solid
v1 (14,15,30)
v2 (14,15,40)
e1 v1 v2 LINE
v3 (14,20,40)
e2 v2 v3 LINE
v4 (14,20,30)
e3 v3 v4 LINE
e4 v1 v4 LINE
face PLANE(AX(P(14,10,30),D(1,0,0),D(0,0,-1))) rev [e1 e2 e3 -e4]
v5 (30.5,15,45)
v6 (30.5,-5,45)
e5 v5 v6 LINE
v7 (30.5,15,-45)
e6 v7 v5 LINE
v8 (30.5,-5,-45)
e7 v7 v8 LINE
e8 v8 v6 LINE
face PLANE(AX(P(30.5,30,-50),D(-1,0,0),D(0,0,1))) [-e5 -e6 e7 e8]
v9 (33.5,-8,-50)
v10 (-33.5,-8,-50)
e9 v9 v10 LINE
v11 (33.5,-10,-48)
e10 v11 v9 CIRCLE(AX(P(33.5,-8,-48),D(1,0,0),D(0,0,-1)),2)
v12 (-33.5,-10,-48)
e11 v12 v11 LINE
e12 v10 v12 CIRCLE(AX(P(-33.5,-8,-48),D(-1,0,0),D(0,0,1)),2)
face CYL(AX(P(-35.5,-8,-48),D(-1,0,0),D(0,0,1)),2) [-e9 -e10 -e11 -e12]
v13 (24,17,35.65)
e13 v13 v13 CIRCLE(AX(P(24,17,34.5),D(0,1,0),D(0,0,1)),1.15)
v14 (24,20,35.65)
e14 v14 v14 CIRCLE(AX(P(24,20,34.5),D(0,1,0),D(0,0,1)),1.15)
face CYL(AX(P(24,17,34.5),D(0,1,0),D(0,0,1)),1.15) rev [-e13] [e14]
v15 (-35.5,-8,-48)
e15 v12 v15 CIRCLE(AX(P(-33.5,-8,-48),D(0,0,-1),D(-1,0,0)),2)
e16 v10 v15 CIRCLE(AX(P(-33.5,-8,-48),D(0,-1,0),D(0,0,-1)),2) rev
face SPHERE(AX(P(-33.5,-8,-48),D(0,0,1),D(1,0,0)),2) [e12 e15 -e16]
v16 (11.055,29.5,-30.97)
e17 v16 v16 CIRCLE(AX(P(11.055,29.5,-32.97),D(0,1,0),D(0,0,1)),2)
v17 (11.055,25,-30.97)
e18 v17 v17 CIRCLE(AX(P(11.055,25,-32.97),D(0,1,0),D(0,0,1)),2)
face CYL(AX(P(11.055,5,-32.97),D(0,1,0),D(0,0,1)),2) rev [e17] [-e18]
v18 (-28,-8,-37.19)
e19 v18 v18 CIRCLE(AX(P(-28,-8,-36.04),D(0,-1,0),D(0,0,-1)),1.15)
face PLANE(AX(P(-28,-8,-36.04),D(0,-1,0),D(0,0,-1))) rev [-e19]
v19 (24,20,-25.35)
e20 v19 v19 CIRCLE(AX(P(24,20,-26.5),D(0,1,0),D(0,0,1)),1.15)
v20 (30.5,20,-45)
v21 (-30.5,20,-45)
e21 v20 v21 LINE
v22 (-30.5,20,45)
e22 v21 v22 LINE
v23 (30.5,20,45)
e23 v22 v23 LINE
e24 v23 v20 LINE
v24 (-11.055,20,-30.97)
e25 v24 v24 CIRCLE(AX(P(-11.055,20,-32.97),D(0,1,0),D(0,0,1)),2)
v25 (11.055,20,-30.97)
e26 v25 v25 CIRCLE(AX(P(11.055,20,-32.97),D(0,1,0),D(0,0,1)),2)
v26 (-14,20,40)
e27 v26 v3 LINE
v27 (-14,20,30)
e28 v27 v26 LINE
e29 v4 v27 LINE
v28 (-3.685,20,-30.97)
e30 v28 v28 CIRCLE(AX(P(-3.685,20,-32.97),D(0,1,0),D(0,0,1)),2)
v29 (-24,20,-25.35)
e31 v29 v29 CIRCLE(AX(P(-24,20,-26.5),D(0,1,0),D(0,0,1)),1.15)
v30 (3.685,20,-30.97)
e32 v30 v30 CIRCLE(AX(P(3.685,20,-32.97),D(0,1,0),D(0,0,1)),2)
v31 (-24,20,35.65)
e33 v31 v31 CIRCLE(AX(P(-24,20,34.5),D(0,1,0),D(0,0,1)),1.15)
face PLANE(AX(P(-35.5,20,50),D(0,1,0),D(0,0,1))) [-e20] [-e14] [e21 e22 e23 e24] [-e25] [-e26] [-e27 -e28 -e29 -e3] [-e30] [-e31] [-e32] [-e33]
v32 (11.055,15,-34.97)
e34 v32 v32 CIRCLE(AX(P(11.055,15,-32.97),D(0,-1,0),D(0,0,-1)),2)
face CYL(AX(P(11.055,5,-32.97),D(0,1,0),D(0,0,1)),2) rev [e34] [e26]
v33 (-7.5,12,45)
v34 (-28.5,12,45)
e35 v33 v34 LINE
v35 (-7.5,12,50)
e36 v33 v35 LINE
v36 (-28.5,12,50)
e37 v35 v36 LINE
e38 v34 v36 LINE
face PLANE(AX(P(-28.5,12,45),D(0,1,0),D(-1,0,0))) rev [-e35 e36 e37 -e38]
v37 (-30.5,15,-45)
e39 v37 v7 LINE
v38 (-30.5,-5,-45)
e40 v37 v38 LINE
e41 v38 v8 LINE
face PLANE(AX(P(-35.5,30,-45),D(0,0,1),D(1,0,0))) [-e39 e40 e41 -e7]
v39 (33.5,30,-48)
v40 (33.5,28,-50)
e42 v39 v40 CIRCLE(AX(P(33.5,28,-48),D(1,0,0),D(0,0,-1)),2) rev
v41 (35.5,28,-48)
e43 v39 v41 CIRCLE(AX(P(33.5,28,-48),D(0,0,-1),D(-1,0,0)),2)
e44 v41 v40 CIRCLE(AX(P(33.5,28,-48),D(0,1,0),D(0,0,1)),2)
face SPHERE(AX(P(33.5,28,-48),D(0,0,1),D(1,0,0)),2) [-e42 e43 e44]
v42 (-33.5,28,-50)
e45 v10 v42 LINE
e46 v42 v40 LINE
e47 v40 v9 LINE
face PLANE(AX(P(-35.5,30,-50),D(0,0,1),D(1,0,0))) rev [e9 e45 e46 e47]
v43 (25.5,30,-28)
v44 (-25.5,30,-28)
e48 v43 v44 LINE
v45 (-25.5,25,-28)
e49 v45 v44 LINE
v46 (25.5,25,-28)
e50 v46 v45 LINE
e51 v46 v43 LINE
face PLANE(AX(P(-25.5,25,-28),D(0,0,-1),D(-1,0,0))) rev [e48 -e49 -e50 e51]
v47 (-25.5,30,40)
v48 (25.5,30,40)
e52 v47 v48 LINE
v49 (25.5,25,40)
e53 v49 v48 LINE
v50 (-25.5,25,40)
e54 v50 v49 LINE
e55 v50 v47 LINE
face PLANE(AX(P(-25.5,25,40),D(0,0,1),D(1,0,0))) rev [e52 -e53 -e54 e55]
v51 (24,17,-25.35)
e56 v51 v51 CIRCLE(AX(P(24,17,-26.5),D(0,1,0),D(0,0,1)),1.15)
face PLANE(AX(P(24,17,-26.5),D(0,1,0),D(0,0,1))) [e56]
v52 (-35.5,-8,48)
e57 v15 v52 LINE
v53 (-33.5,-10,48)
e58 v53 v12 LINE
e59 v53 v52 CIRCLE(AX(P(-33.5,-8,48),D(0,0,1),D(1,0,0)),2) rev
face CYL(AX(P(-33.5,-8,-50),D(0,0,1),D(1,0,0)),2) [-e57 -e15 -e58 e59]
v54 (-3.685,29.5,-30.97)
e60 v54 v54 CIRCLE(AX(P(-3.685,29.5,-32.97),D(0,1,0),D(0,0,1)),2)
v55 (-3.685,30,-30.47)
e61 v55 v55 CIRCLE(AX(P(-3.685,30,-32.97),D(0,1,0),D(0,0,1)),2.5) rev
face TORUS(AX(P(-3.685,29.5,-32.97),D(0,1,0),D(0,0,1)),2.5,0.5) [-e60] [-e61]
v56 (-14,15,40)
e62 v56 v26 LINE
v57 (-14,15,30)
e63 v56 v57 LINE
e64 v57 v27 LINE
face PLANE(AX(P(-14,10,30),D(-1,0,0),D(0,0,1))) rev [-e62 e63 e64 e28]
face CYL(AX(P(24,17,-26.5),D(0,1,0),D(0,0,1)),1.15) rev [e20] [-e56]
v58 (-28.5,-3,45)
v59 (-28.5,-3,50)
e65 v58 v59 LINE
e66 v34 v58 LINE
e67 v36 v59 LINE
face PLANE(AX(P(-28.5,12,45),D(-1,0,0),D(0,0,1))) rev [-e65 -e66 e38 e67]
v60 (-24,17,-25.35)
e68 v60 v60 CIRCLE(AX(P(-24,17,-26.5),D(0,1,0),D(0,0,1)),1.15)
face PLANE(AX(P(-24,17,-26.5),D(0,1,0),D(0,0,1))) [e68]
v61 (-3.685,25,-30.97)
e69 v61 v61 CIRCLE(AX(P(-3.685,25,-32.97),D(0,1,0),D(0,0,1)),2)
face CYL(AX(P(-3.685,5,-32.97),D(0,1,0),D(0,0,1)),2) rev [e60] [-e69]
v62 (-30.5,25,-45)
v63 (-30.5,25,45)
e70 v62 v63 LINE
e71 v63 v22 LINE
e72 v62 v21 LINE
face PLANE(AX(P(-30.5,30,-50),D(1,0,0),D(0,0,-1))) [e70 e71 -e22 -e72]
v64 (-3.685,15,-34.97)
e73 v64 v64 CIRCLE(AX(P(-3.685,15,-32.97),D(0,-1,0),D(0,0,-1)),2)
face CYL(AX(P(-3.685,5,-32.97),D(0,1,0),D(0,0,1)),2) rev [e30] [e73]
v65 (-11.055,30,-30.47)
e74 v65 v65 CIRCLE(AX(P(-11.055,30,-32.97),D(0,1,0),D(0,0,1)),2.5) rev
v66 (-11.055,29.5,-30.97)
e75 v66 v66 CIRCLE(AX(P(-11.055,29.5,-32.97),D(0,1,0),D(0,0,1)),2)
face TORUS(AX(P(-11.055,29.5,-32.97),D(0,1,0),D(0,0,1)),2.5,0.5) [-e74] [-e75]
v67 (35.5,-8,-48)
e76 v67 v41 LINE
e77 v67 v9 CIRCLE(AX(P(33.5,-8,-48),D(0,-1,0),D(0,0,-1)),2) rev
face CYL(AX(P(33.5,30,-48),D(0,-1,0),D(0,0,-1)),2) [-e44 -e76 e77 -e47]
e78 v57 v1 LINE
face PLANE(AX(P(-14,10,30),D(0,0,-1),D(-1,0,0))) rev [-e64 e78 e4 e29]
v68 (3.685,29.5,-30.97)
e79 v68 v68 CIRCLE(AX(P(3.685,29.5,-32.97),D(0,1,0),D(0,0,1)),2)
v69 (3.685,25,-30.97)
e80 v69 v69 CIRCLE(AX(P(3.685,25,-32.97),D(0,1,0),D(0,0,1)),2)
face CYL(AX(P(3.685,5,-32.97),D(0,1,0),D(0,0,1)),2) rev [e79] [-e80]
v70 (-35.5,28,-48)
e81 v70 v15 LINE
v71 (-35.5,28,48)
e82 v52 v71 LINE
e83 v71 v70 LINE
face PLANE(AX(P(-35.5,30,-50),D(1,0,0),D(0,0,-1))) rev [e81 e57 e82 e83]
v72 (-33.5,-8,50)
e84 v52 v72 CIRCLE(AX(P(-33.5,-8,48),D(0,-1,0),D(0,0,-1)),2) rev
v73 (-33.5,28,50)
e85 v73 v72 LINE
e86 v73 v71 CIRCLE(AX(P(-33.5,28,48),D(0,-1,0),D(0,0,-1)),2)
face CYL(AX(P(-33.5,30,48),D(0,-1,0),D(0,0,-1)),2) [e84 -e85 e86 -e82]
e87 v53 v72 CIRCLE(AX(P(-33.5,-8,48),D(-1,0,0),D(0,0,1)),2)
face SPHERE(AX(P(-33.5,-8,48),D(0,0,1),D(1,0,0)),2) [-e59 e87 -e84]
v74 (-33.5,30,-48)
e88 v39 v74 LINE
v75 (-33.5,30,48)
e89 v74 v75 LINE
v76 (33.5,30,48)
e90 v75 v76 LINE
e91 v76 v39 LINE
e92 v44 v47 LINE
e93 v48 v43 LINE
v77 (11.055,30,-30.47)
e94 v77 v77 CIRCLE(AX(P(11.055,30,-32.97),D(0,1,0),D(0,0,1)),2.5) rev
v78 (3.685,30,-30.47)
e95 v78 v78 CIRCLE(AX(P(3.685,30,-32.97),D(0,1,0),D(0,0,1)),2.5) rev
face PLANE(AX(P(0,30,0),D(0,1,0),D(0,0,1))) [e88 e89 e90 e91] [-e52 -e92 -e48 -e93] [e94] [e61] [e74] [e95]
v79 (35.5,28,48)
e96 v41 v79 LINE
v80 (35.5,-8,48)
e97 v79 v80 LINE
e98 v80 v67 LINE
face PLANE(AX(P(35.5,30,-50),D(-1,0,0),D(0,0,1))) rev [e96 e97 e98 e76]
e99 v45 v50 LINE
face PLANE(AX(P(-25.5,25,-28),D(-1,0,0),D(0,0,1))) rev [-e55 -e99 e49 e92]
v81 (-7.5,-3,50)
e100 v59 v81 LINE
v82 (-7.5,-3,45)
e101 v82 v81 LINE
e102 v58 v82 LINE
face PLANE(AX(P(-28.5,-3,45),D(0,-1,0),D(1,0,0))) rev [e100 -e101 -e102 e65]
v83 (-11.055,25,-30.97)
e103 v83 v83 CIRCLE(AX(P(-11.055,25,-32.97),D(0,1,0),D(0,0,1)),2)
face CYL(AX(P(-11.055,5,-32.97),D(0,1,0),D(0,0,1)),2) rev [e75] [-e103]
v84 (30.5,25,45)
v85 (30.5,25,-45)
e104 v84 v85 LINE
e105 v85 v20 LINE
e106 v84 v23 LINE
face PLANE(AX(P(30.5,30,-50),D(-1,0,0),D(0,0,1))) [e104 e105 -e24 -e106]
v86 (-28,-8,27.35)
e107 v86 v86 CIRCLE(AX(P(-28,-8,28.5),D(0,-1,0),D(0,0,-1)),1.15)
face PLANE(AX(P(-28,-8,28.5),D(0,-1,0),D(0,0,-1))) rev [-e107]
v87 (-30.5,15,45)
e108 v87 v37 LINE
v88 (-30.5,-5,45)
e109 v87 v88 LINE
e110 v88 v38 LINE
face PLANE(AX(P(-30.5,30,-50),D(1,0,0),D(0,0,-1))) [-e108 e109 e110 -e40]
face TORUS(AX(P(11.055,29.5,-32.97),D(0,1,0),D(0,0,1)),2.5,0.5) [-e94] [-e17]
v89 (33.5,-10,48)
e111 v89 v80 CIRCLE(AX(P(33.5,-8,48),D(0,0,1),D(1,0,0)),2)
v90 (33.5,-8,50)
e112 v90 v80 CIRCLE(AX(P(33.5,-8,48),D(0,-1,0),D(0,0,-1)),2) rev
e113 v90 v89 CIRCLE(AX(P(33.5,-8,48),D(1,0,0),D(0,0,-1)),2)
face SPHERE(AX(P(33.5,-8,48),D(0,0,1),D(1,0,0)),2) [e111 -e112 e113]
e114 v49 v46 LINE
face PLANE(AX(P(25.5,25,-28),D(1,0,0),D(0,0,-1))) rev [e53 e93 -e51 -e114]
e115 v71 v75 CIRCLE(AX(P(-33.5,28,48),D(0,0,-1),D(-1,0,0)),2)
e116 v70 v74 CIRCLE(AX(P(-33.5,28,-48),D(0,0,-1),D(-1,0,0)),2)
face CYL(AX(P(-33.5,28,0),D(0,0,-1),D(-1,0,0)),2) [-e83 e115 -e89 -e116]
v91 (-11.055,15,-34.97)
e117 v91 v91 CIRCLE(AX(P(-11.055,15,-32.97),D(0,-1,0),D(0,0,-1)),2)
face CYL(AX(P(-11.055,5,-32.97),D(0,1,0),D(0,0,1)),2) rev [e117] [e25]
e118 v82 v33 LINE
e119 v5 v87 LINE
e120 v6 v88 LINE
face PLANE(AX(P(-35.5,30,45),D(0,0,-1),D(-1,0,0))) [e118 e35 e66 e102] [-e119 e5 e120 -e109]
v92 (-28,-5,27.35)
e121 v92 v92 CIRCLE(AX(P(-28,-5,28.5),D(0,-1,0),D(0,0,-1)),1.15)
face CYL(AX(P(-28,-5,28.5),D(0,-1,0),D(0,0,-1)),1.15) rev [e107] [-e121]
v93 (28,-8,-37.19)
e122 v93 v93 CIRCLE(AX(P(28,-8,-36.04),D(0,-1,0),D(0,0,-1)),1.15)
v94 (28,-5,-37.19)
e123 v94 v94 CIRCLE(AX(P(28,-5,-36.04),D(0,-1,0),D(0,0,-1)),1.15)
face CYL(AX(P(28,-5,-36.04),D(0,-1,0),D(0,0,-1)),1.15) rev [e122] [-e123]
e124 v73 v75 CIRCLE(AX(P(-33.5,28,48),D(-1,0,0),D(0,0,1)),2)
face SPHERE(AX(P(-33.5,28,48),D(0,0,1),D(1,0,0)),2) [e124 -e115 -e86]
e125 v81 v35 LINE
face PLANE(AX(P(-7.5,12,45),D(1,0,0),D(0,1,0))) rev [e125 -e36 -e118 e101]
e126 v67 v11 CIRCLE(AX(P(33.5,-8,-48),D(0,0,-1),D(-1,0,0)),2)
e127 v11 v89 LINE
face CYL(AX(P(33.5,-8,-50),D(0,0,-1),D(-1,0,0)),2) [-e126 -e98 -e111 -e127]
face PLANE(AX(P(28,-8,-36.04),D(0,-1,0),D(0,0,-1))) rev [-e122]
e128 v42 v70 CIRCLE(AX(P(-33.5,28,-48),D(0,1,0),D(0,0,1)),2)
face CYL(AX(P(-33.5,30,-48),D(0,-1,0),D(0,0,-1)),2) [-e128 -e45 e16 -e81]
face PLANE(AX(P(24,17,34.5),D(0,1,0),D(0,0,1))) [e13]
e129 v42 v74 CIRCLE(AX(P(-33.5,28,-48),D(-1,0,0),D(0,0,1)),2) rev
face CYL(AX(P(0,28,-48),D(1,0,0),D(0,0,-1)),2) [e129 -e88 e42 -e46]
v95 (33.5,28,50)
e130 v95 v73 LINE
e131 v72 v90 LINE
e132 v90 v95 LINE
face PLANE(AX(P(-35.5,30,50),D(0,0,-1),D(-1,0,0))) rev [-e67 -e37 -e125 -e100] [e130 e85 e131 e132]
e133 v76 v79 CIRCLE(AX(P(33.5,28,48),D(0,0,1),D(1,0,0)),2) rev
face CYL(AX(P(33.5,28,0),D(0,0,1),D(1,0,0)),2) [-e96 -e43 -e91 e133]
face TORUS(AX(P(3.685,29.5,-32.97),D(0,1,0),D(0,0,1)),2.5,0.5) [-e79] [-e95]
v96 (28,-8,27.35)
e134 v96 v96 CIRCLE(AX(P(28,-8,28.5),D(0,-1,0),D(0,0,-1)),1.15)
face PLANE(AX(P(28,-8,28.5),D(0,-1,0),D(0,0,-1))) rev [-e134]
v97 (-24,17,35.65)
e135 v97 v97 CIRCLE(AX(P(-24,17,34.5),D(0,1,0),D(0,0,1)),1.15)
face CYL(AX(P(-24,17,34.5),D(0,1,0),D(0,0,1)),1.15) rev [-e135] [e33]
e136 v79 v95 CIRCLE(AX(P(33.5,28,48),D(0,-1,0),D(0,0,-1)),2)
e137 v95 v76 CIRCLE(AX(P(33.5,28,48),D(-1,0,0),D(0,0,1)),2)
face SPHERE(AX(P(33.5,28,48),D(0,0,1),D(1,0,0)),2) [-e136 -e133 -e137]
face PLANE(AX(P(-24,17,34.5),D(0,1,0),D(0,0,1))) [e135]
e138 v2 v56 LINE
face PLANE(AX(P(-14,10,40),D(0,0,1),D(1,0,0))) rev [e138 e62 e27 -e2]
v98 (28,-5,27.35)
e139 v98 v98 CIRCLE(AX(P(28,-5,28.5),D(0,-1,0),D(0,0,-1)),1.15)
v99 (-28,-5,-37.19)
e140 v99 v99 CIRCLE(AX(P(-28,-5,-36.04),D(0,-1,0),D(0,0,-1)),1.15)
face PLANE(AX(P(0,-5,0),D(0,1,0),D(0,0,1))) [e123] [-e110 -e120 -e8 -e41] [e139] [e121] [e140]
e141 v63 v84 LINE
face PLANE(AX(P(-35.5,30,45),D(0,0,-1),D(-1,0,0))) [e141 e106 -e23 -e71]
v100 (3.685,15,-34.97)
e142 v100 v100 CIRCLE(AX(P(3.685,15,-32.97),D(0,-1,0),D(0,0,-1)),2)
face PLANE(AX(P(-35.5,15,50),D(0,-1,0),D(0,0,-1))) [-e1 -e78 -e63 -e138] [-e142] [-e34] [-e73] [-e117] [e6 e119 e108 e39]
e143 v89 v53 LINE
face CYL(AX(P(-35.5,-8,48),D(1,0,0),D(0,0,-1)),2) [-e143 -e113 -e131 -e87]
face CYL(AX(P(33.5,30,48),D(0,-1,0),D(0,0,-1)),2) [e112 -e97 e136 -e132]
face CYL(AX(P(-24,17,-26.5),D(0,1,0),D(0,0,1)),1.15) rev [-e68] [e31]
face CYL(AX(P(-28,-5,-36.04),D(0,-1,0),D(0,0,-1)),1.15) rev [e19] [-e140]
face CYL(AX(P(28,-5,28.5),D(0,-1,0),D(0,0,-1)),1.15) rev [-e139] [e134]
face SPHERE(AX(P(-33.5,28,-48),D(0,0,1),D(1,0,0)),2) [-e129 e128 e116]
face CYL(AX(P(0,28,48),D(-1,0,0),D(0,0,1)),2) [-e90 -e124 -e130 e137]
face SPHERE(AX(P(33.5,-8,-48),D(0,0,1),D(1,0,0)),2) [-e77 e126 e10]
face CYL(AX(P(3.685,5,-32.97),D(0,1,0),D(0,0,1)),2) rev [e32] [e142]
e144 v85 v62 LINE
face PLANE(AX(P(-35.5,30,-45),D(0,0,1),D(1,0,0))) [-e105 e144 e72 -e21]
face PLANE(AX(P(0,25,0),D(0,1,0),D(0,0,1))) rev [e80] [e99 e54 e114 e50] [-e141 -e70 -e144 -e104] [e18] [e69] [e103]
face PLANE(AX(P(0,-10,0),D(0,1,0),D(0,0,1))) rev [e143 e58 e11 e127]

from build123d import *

# Parameters (mm, degrees)
SKETCH1_W           = 71
SKETCH1_H           = 100
BOSS_EXTRUDE1_DEPTH = 30
SHELL3_T            = -5
SKETCH3_W           = 71
SKETCH3_H           = 100
BOSS_EXTRUDE2_DEPTH = 5
SKETCH4_W           = 51
SKETCH4_H           = 68
CUT_EXTRUDE2_DEPTH  = 5
SKETCH1_2_W         = 71
SKETCH1_2_H         = 100
BOSS_EXTRUDE3_DEPTH = 10
SKETCH10_W          = 61
SKETCH10_H          = 90
CUT_EXTRUDE6_DEPTH  = 20
SKETCH10_2_W        = 61
SKETCH10_2_H        = 90
BOSS_EXTRUDE4_DEPTH = 5
SKETCH12_W          = 100
SKETCH12_H          = 5
BOSS_EXTRUDE5_DEPTH = 71
SKETCH5_R           = 2
CUT_EXTRUDE3_DEPTH  = 25
CUT_EXTRUDE7_START  = 2
SKETCH13_R          = 1.15
CUT_EXTRUDE7_DEPTH  = 5
SKETCH14_W          = 21
SKETCH14_H          = 15
CUT_EXTRUDE8_DEPTH  = 5
CUT_EXTRUDE9_START  = -2
SKETCH15_R          = 1.15
CUT_EXTRUDE9_DEPTH  = 3
SKETCH16_W          = 28
SKETCH16_H          = 10
CUT_EXTRUDE10_DEPTH = 10
FILLET1_R           = 2
FILLET2_R           = 2
FILLET5_R           = 0.5


with BuildPart() as part:
    # Sketch1 → Boss-Extrude1 (new body)
    with BuildSketch(Plane(origin=(0, 0, 0), x_dir=(1, 0, 0), z_dir=(0, 1, 0))):
        Rectangle(SKETCH1_W, SKETCH1_H)
    extrude(amount=BOSS_EXTRUDE1_DEPTH)

    # Shell3
    shell3_openings = [part.faces().sort_by_distance(p)[0] for p in [
        (0, 30, 0),
    ]]
    offset(amount=SHELL3_T, openings=shell3_openings, kind=Kind.INTERSECTION)

    # Sketch3 → Boss-Extrude2 (add)
    with BuildSketch(Plane(origin=(0, 30, 0), x_dir=(1, 0, 0), z_dir=(0, 1, 0))):
        Rectangle(SKETCH3_W, SKETCH3_H)
    extrude(amount=-BOSS_EXTRUDE2_DEPTH)

    # Sketch4 → Cut-Extrude2 (cut)
    with BuildSketch(Plane(origin=(0, 30, 0), x_dir=(1, 0, 0), z_dir=(0, 1, 0))):
        with Locations((0, -6)):
            Rectangle(SKETCH4_W, SKETCH4_H)
    extrude(amount=-CUT_EXTRUDE2_DEPTH, mode=Mode.SUBTRACT)

    # Sketch1<2> → Boss-Extrude3 (add)
    with BuildSketch(Plane(origin=(0, 0, 0), x_dir=(1, 0, 0), z_dir=(0, 1, 0))):
        Rectangle(SKETCH1_2_W, SKETCH1_2_H)
    extrude(amount=-BOSS_EXTRUDE3_DEPTH)

    # Sketch10 → Cut-Extrude6 (cut)
    with BuildSketch(Plane.XZ.offset(10)):
        Rectangle(SKETCH10_W, SKETCH10_H)
    extrude(amount=-CUT_EXTRUDE6_DEPTH, mode=Mode.SUBTRACT)

    # Sketch10<2> → Boss-Extrude4 (add)
    with BuildSketch(Plane.XZ.offset(10)):
        Rectangle(SKETCH10_2_W, SKETCH10_2_H)
    extrude(amount=-BOSS_EXTRUDE4_DEPTH)

    # Sketch12 → Boss-Extrude5 (add)
    with BuildSketch(Plane(origin=(35.5, 0, 0), x_dir=(0, 0, -1), z_dir=(1, 0, 0))):
        with Locations((0, 17.5)):
            Rectangle(SKETCH12_W, SKETCH12_H)
    extrude(amount=-BOSS_EXTRUDE5_DEPTH)

    # Sketch5 → Cut-Extrude3 (cut)
    with BuildSketch(Plane(origin=(0, 30, 0), x_dir=(1, 0, 0), z_dir=(0, 1, 0))):
        with Locations(Location((-11.055, 32.97, 0), (0, 0, 270))):
            Circle(SKETCH5_R)
        with Locations(Location((-3.685, 32.97, 0), (0, 0, 270))):
            Circle(SKETCH5_R)
        with Locations(Location((3.685, 32.97, 0), (0, 0, 270))):
            Circle(SKETCH5_R)
        with Locations(Location((11.055, 32.97, 0), (0, 0, 270))):
            Circle(SKETCH5_R)
    extrude(amount=-CUT_EXTRUDE3_DEPTH, mode=Mode.SUBTRACT)

    # Sketch13 → Cut-Extrude7 (cut)
    with BuildSketch(Plane(origin=(0, 20, 0), x_dir=(1, 0, 0), z_dir=(0, 1, 0)).offset(CUT_EXTRUDE7_START)):
        with Locations(Location((-24, 26.5, 0), (0, 0, 270))):
            Circle(SKETCH13_R)
        with Locations(Location((24, 26.5, 0), (0, 0, 270))):
            Circle(SKETCH13_R)
        with Locations(Location((24, -34.5, 0), (0, 0, 270))):
            Circle(SKETCH13_R)
        with Locations(Location((-24, -34.5, 0), (0, 0, 270))):
            Circle(SKETCH13_R)
    extrude(amount=-CUT_EXTRUDE7_DEPTH, mode=Mode.SUBTRACT)

    # Sketch14 → Cut-Extrude8 (cut)
    with BuildSketch(Plane.XY.offset(50)):
        with Locations((-18, 4.5)):
            Rectangle(SKETCH14_W, SKETCH14_H)
    extrude(amount=-CUT_EXTRUDE8_DEPTH, mode=Mode.SUBTRACT)

    # Sketch15 → Cut-Extrude9 (cut)
    with BuildSketch(Plane.XZ.offset(10).offset(CUT_EXTRUDE9_START)):
        with Locations(Location((28, -36.04, 0), (0, 0, 270))):
            Circle(SKETCH15_R)
        with Locations(Location((-28, -36.04, 0), (0, 0, 270))):
            Circle(SKETCH15_R)
        with Locations(Location((28, 28.5, 0), (0, 0, 270))):
            Circle(SKETCH15_R)
        with Locations(Location((-28, 28.5, 0), (0, 0, 270))):
            Circle(SKETCH15_R)
    extrude(amount=-CUT_EXTRUDE9_DEPTH, mode=Mode.SUBTRACT)

    # Sketch16 → Cut-Extrude10 (cut)
    with BuildSketch(Plane(origin=(0, 20, 0), x_dir=(1, 0, 0), z_dir=(0, 1, 0))):
        with Locations((0, -35)):
            Rectangle(SKETCH16_W, SKETCH16_H)
    extrude(amount=-CUT_EXTRUDE10_DEPTH, mode=Mode.SUBTRACT)

    # Fillet1
    fillet1_edges = [part.edges().sort_by_distance(p)[0] for p in [
        (-35.5, 30, 0),
        (35.5, 30, 0),
        (35.5, -10, 0),
        (0, -10, 50),
        (-35.5, -10, 0),
        (0, -10, -50),
        (0, 30, -50),
        (35.5, 10, 50),
        (-35.5, 10, 50),
        (-35.5, 10, -50),
        (35.5, 10, -50),
    ]]
    fillet(fillet1_edges, radius=FILLET1_R)

    # Fillet2
    # the kernel refuses this fillet: 2 mm, written as the material it takes off along each edge
    with BuildSketch(Plane(origin=(33.5, 28, 48), x_dir=(0, 0, 1), z_dir=(0, 1, 0))) as fillet2_piece_1_section:
        Polygon((0, 0), (FILLET2_R, 0), (FILLET2_R, FILLET2_R), (0, FILLET2_R), align=None)
    fillet2_piece_1 = extrude(amount=FILLET2_R, mode=Mode.PRIVATE)
    fillet2_piece_1 = fillet2_piece_1 - Plane(origin=(33.5, 28, 48), x_dir=(-0.7071067811865476, 0, -0.7071067811865475), z_dir=(0, 1, 0)) * Sphere(FILLET2_R, mode=Mode.PRIVATE)
    add(fillet2_piece_1, mode=Mode.SUBTRACT)
    with BuildSketch(Plane(origin=(-33.5, 28, 48), x_dir=(0, 0, 1), z_dir=(0, 1, 0))) as fillet2_piece_2_section:
        Polygon((0, 0), (FILLET2_R, 0), (FILLET2_R, -FILLET2_R), (0, -FILLET2_R), align=None)
    fillet2_piece_2 = extrude(amount=FILLET2_R, mode=Mode.PRIVATE)
    fillet2_piece_2 = fillet2_piece_2 - Plane(origin=(-33.5, 28, 48), x_dir=(0.7071067811865475, 0, -0.7071067811865477), z_dir=(0, 1, 0)) * Sphere(FILLET2_R, mode=Mode.PRIVATE)
    add(fillet2_piece_2, mode=Mode.SUBTRACT)
    with BuildSketch(Plane(origin=(33.5, 30, 50), x_dir=(0, 0, -1), z_dir=(-1, 0, 0))) as fillet2_piece_3:
        with BuildLine():
            CenterArc((FILLET2_R, FILLET2_R), FILLET2_R, 180, 90)
            Line((0, FILLET2_R), (0, 0))
            Line((0, 0), (FILLET2_R, 0))
        make_face()
    extrude(amount=67, mode=Mode.SUBTRACT)

    # Fillet5
    fillet5_edges = [part.edges().sort_by_distance(p)[0] for p in [
        (11.055, 30, -34.97),
        (3.685, 30, -34.97),
        (-11.055, 30, -34.97),
        (-3.685, 30, -34.97),
    ]]
    fillet(fillet5_edges, radius=FILLET5_R)


solid = part.part
